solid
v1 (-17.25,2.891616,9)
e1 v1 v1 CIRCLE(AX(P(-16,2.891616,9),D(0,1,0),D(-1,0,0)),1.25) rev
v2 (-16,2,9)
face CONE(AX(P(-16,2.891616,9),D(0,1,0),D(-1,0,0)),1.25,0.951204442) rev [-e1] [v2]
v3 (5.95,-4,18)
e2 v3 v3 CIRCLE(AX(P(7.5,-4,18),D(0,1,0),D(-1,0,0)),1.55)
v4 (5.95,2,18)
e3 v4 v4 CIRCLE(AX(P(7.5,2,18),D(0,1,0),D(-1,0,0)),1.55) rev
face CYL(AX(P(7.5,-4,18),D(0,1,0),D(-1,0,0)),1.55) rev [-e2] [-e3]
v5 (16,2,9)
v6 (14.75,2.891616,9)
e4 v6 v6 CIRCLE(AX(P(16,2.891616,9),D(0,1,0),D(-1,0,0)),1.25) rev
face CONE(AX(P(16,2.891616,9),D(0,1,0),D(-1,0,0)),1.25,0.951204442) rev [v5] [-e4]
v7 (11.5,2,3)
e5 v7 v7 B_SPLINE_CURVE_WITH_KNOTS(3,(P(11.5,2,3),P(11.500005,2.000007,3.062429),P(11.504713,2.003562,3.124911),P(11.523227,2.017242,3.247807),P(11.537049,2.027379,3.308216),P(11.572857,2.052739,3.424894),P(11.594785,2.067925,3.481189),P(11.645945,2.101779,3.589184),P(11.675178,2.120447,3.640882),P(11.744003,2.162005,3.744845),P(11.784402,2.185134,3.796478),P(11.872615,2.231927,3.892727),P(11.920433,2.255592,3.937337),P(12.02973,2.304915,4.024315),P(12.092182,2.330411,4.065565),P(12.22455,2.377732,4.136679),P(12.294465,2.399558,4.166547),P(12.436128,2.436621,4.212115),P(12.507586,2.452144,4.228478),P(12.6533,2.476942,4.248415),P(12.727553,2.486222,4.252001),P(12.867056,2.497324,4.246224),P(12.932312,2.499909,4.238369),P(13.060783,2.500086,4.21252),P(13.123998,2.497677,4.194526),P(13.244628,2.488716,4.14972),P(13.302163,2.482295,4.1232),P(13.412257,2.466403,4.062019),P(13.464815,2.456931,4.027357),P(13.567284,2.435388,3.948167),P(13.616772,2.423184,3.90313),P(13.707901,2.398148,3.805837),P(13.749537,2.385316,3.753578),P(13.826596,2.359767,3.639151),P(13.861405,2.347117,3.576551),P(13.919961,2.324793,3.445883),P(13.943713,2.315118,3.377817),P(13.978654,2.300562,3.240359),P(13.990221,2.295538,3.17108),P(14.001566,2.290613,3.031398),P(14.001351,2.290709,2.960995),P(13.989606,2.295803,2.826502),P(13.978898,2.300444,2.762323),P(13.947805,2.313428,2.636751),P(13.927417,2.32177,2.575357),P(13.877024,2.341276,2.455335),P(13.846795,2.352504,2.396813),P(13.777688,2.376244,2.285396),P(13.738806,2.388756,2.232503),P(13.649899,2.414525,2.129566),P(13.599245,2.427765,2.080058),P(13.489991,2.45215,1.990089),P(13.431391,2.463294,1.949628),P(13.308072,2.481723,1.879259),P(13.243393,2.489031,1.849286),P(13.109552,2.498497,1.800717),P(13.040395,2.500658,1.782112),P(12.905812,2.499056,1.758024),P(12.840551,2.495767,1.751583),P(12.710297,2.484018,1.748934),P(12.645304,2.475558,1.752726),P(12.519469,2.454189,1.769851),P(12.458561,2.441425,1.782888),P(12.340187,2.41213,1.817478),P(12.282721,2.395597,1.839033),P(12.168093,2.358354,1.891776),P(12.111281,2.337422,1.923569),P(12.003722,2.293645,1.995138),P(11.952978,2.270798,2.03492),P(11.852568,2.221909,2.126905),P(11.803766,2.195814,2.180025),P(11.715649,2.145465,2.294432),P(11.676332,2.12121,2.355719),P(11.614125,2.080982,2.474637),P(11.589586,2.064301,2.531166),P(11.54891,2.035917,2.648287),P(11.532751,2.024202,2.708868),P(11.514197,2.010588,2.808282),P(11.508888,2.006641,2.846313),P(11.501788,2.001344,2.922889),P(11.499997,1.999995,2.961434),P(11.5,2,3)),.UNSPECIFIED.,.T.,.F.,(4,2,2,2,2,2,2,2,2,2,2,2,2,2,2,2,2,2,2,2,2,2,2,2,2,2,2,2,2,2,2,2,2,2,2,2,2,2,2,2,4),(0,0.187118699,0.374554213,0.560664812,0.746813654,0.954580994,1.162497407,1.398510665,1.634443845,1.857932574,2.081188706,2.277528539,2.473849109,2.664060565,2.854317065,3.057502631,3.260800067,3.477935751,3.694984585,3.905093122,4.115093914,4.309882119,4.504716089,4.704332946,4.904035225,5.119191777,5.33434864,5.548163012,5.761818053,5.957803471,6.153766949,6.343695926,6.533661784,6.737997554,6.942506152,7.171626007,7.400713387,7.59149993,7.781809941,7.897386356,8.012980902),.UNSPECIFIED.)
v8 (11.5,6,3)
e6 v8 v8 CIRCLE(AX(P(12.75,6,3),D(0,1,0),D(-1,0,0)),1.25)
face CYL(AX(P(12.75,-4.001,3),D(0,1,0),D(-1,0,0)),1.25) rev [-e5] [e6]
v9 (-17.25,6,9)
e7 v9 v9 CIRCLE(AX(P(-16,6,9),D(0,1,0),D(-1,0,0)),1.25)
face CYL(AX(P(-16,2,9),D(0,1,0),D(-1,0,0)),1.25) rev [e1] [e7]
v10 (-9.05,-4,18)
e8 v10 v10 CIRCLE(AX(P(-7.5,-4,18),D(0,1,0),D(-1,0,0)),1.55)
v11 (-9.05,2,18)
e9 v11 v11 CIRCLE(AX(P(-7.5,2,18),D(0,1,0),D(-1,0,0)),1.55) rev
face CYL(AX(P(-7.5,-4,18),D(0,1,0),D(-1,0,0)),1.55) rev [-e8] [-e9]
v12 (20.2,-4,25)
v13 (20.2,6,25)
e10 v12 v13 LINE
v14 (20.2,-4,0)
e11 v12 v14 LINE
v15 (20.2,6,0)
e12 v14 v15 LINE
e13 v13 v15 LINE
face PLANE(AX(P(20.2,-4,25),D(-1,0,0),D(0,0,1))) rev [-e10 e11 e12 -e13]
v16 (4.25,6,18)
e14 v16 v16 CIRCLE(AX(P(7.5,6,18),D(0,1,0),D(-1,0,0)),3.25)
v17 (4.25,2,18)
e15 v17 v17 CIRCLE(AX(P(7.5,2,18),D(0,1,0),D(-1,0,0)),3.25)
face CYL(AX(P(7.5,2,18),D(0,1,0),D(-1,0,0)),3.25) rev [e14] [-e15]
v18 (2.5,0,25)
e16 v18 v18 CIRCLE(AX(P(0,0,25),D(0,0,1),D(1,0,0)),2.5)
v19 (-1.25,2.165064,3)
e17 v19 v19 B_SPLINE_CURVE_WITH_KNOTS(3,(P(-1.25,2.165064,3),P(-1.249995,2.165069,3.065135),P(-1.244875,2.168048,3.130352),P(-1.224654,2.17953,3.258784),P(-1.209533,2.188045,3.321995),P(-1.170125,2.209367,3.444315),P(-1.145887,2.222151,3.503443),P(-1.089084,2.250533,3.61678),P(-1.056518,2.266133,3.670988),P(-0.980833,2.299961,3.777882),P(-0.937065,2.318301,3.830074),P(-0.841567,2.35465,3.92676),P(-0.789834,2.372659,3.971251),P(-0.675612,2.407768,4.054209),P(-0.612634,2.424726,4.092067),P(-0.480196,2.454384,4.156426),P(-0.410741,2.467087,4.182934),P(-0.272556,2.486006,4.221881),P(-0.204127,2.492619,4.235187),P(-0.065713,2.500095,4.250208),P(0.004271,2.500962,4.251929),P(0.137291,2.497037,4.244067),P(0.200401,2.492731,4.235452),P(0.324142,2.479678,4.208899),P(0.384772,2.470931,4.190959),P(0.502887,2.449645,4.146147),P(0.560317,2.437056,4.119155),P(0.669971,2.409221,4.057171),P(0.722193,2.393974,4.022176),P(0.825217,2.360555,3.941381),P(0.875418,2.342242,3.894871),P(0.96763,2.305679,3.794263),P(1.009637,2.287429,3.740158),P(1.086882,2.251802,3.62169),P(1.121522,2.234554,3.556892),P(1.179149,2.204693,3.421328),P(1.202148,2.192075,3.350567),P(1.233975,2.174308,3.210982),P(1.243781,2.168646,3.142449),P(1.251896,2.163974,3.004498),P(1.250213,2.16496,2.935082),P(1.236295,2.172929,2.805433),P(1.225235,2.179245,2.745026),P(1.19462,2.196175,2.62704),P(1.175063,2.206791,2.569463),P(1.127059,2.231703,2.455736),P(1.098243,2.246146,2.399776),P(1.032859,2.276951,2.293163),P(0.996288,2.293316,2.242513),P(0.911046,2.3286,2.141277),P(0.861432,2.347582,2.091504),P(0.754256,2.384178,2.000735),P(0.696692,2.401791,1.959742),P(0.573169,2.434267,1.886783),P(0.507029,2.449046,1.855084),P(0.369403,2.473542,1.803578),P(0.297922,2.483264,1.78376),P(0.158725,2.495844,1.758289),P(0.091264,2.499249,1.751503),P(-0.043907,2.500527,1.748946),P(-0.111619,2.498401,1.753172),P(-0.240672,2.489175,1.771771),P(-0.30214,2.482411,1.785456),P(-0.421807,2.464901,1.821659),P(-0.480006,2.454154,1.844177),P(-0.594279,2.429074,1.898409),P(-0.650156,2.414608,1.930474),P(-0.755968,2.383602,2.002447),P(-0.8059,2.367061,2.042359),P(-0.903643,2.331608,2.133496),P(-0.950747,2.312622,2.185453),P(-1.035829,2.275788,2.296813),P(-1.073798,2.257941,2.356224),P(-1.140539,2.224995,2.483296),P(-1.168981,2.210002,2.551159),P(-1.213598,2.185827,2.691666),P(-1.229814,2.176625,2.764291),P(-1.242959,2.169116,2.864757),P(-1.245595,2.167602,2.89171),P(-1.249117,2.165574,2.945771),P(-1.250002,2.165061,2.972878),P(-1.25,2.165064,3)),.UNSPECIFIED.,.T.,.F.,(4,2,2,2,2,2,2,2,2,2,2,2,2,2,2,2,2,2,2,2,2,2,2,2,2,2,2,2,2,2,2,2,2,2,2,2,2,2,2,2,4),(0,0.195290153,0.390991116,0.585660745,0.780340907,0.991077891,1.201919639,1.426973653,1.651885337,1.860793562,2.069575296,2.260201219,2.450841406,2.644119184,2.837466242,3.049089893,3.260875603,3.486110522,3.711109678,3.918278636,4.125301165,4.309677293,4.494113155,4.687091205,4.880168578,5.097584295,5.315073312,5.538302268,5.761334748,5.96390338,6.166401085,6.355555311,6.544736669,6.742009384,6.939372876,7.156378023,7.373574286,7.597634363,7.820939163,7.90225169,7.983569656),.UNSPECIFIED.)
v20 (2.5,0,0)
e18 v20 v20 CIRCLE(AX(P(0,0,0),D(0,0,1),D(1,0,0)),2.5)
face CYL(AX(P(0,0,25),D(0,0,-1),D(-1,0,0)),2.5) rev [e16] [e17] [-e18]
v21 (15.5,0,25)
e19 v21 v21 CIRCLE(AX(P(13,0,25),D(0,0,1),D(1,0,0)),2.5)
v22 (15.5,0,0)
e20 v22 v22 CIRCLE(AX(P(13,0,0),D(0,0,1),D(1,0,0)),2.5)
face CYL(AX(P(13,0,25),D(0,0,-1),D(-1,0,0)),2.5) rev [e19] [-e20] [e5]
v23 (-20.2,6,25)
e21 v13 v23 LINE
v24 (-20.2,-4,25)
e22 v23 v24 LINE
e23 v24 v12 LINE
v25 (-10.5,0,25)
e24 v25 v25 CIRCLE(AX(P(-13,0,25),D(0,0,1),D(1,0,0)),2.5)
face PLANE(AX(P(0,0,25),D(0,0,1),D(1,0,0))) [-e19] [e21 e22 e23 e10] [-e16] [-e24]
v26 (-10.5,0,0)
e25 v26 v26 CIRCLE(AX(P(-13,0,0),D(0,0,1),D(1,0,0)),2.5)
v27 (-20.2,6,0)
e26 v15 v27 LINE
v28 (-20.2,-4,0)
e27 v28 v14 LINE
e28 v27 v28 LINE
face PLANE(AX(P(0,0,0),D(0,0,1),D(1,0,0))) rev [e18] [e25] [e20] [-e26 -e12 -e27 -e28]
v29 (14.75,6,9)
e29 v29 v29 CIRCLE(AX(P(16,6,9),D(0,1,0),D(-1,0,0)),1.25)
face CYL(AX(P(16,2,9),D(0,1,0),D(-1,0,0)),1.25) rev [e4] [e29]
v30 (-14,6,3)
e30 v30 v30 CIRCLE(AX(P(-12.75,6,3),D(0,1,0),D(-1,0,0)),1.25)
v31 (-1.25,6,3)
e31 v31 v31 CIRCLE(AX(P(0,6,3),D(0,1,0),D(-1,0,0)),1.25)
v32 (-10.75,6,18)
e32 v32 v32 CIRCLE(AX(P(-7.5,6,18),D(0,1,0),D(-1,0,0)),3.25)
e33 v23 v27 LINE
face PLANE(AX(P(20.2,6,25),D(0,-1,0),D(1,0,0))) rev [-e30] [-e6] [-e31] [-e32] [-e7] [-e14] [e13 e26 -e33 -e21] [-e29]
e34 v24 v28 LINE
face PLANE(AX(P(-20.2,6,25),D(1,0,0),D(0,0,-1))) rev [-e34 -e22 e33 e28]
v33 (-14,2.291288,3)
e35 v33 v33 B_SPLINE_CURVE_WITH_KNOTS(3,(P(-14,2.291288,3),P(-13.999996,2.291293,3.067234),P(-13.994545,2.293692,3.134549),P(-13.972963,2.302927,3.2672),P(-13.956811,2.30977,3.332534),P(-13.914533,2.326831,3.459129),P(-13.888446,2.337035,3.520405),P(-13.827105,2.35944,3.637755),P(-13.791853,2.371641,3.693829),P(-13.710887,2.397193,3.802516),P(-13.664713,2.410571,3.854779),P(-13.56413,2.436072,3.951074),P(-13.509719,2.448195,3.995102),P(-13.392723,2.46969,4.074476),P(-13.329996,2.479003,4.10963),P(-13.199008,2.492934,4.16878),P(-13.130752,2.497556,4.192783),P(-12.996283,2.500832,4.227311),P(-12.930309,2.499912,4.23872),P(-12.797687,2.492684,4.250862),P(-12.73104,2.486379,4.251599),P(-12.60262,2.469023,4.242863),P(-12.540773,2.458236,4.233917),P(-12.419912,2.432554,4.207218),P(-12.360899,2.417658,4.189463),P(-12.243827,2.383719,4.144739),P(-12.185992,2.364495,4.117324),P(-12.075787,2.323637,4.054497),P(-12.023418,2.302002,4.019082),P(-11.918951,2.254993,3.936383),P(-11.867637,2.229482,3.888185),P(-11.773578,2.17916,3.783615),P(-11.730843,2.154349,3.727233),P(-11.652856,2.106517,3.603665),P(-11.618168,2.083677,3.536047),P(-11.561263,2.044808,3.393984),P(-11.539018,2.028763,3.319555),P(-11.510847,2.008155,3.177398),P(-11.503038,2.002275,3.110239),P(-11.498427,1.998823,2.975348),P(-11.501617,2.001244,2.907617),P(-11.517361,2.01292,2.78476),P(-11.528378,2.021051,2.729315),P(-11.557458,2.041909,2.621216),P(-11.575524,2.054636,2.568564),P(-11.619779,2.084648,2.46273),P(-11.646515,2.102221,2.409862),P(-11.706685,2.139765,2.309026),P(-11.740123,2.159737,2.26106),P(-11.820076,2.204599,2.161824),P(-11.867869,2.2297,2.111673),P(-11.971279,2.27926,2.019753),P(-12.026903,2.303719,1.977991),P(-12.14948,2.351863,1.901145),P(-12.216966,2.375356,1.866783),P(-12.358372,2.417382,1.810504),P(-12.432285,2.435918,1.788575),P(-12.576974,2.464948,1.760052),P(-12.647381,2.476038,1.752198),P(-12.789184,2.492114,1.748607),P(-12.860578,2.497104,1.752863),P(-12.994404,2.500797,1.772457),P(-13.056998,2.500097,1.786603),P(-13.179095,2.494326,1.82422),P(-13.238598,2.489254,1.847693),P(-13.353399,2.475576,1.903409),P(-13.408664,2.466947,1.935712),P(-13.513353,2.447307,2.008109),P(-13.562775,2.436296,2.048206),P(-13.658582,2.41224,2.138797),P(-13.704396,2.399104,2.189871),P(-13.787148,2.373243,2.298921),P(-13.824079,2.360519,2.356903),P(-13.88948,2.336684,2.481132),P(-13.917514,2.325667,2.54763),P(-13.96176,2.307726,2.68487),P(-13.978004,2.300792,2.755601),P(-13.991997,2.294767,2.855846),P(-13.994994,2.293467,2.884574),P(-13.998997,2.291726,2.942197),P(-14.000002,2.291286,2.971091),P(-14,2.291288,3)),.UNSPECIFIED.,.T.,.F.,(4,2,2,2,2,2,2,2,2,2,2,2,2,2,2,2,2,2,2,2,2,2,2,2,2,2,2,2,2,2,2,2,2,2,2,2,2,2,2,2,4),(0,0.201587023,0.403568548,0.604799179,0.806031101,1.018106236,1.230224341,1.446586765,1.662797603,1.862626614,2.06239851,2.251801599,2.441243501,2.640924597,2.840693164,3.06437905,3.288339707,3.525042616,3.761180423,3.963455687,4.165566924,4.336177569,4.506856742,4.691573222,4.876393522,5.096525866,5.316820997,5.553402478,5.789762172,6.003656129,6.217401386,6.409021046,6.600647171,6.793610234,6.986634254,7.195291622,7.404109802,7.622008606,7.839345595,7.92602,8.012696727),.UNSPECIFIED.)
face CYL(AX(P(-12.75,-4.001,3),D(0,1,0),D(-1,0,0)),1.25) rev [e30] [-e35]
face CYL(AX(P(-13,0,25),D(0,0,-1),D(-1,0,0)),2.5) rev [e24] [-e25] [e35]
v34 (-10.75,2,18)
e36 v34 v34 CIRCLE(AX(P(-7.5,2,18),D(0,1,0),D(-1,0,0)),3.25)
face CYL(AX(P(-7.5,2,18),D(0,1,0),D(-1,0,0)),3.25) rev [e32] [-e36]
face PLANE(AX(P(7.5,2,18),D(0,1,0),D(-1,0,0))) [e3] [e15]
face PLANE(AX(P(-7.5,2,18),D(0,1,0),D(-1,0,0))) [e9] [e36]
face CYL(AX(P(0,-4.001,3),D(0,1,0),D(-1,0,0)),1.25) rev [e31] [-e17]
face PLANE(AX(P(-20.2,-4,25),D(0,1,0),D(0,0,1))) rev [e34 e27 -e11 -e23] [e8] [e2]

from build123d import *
from OCP.BRepFilletAPI import BRepFilletAPI_MakeChamfer

# Parameters (mm, degrees)
SKETCH1_W           = 40.4
SKETCH1_H           = 10
SKETCH1_R           = 2.5
BOSS_EXTRUDE1_DEPTH = 25
SKETCH2_R           = 1.55
CUT_EXTRUDE1_DEPTH  = 34.66065953
CUT_EXTRUDE2_REACH  = 35.661
SKETCH3_R           = 1.25
SKETCH4_R           = 1.25
CUT_EXTRUDE3_DEPTH  = 4
CHAMFER1_SIZE       = 0.891616335
CHAMFER1_SIZE_2     = 1.25
SKETCH5_R           = 3.25
CUT_EXTRUDE4_DEPTH  = 4


with BuildPart() as part:
    # Sketch1 → Boss-Extrude1 (new body)
    with BuildSketch(Plane.XY):
        with Locations((0, 1)):
            Rectangle(SKETCH1_W, SKETCH1_H)
        Circle(SKETCH1_R, mode=Mode.SUBTRACT)
        with Locations((13, 0)):
            Circle(SKETCH1_R, mode=Mode.SUBTRACT)
        with Locations((-13, 0)):
            Circle(SKETCH1_R, mode=Mode.SUBTRACT)
    extrude(amount=BOSS_EXTRUDE1_DEPTH)

    # Sketch2 → Cut-Extrude1 (cut, through all)
    with BuildSketch(Plane(origin=(0, 6, 0), x_dir=(1, 0, 0), z_dir=(0, 1, 0))):
        with Locations(Location((7.5, -18, 0), (0, 0, 180))):
            Circle(SKETCH2_R)
        with Locations(Location((-7.5, -18, 0), (0, 0, 180))):
            Circle(SKETCH2_R)
    extrude(amount=-CUT_EXTRUDE1_DEPTH, mode=Mode.SUBTRACT)

    # Sketch3 → Cut-Extrude2 (cut, up to next)
    with BuildSketch(Plane(origin=(0, 6, 0), x_dir=(1, 0, 0), z_dir=(0, 1, 0)), mode=Mode.PRIVATE) as cut_extrude2_sk1:
        with Locations(Location((0, -3, 0), (0, 0, 180))):
            Circle(SKETCH3_R)
    cut_extrude2_tool1 = extrude(cut_extrude2_sk1.sketch, amount=-CUT_EXTRUDE2_REACH, mode=Mode.PRIVATE) & part.part
    # Sketch3 → Cut-Extrude2 (cut, up to next)
    with BuildSketch(Plane(origin=(0, 6, 0), x_dir=(1, 0, 0), z_dir=(0, 1, 0)), mode=Mode.PRIVATE) as cut_extrude2_sk2:
        with Locations(Location((-12.75, -3, 0), (0, 0, 180))):
            Circle(SKETCH3_R)
    cut_extrude2_tool2 = extrude(cut_extrude2_sk2.sketch, amount=-CUT_EXTRUDE2_REACH, mode=Mode.PRIVATE) & part.part
    # Sketch3 → Cut-Extrude2 (cut, up to next)
    with BuildSketch(Plane(origin=(0, 6, 0), x_dir=(1, 0, 0), z_dir=(0, 1, 0)), mode=Mode.PRIVATE) as cut_extrude2_sk3:
        with Locations(Location((12.75, -3, 0), (0, 0, 180))):
            Circle(SKETCH3_R)
    cut_extrude2_tool3 = extrude(cut_extrude2_sk3.sketch, amount=-CUT_EXTRUDE2_REACH, mode=Mode.PRIVATE) & part.part
    add(cut_extrude2_tool1.solids().sort_by_distance((0, 6, 3))[0], mode=Mode.SUBTRACT)
    add(cut_extrude2_tool2.solids().sort_by_distance((-12.75, 6, 3))[0], mode=Mode.SUBTRACT)
    add(cut_extrude2_tool3.solids().sort_by_distance((12.75, 6, 3))[0], mode=Mode.SUBTRACT)

    # Sketch4 → Cut-Extrude3 (cut)
    with BuildSketch(Plane(origin=(0, 6, 0), x_dir=(1, 0, 0), z_dir=(0, 1, 0))):
        with Locations(Location((-16, -9, 0), (0, 0, 180))):
            Circle(SKETCH4_R)
        with Locations(Location((16, -9, 0), (0, 0, 180))):
            Circle(SKETCH4_R)
    extrude(amount=-CUT_EXTRUDE3_DEPTH, mode=Mode.SUBTRACT)

    # Chamfer1
    chamfer1_edges_1 = [part.edges().sort_by_distance(p)[0] for p in [
        (-14.75, 2, 9),
    ]]
    chamfer1_side_1 = [part.faces().sort_by_distance(p)[0] for p in [
        (-14.75, 2.017832327, 9),
    ]]
    chamfer1_edges_2 = [part.edges().sort_by_distance(p)[0] for p in [
        (17.25, 2, 9),
    ]]
    chamfer1_side_2 = [part.faces().sort_by_distance(p)[0] for p in [
        (17.25, 2.017832327, 9),
    ]]
    chamfer1 = BRepFilletAPI_MakeChamfer(part.part.solid().wrapped)
    for e in chamfer1_edges_1:
        chamfer1.Add(CHAMFER1_SIZE - 0.0001, CHAMFER1_SIZE_2 - 0.0001, e.wrapped, chamfer1_side_1[0].wrapped)
    for e in chamfer1_edges_2:
        chamfer1.Add(CHAMFER1_SIZE - 0.0001, CHAMFER1_SIZE_2 - 0.0001, e.wrapped, chamfer1_side_2[0].wrapped)
    add(Compound.cast(chamfer1.Shape()), mode=Mode.REPLACE)  # a hair under: the kernel refuses the full size

    # Sketch5 → Cut-Extrude4 (cut)
    with BuildSketch(Plane(origin=(0, 6, 0), x_dir=(1, 0, 0), z_dir=(0, 1, 0))):
        with Locations(Location((7.5, -18, 0), (0, 0, 180))):
            Circle(SKETCH5_R)
        with Locations(Location((-7.5, -18, 0), (0, 0, 180))):
            Circle(SKETCH5_R)
    extrude(amount=-CUT_EXTRUDE4_DEPTH, mode=Mode.SUBTRACT)


solid = part.part
